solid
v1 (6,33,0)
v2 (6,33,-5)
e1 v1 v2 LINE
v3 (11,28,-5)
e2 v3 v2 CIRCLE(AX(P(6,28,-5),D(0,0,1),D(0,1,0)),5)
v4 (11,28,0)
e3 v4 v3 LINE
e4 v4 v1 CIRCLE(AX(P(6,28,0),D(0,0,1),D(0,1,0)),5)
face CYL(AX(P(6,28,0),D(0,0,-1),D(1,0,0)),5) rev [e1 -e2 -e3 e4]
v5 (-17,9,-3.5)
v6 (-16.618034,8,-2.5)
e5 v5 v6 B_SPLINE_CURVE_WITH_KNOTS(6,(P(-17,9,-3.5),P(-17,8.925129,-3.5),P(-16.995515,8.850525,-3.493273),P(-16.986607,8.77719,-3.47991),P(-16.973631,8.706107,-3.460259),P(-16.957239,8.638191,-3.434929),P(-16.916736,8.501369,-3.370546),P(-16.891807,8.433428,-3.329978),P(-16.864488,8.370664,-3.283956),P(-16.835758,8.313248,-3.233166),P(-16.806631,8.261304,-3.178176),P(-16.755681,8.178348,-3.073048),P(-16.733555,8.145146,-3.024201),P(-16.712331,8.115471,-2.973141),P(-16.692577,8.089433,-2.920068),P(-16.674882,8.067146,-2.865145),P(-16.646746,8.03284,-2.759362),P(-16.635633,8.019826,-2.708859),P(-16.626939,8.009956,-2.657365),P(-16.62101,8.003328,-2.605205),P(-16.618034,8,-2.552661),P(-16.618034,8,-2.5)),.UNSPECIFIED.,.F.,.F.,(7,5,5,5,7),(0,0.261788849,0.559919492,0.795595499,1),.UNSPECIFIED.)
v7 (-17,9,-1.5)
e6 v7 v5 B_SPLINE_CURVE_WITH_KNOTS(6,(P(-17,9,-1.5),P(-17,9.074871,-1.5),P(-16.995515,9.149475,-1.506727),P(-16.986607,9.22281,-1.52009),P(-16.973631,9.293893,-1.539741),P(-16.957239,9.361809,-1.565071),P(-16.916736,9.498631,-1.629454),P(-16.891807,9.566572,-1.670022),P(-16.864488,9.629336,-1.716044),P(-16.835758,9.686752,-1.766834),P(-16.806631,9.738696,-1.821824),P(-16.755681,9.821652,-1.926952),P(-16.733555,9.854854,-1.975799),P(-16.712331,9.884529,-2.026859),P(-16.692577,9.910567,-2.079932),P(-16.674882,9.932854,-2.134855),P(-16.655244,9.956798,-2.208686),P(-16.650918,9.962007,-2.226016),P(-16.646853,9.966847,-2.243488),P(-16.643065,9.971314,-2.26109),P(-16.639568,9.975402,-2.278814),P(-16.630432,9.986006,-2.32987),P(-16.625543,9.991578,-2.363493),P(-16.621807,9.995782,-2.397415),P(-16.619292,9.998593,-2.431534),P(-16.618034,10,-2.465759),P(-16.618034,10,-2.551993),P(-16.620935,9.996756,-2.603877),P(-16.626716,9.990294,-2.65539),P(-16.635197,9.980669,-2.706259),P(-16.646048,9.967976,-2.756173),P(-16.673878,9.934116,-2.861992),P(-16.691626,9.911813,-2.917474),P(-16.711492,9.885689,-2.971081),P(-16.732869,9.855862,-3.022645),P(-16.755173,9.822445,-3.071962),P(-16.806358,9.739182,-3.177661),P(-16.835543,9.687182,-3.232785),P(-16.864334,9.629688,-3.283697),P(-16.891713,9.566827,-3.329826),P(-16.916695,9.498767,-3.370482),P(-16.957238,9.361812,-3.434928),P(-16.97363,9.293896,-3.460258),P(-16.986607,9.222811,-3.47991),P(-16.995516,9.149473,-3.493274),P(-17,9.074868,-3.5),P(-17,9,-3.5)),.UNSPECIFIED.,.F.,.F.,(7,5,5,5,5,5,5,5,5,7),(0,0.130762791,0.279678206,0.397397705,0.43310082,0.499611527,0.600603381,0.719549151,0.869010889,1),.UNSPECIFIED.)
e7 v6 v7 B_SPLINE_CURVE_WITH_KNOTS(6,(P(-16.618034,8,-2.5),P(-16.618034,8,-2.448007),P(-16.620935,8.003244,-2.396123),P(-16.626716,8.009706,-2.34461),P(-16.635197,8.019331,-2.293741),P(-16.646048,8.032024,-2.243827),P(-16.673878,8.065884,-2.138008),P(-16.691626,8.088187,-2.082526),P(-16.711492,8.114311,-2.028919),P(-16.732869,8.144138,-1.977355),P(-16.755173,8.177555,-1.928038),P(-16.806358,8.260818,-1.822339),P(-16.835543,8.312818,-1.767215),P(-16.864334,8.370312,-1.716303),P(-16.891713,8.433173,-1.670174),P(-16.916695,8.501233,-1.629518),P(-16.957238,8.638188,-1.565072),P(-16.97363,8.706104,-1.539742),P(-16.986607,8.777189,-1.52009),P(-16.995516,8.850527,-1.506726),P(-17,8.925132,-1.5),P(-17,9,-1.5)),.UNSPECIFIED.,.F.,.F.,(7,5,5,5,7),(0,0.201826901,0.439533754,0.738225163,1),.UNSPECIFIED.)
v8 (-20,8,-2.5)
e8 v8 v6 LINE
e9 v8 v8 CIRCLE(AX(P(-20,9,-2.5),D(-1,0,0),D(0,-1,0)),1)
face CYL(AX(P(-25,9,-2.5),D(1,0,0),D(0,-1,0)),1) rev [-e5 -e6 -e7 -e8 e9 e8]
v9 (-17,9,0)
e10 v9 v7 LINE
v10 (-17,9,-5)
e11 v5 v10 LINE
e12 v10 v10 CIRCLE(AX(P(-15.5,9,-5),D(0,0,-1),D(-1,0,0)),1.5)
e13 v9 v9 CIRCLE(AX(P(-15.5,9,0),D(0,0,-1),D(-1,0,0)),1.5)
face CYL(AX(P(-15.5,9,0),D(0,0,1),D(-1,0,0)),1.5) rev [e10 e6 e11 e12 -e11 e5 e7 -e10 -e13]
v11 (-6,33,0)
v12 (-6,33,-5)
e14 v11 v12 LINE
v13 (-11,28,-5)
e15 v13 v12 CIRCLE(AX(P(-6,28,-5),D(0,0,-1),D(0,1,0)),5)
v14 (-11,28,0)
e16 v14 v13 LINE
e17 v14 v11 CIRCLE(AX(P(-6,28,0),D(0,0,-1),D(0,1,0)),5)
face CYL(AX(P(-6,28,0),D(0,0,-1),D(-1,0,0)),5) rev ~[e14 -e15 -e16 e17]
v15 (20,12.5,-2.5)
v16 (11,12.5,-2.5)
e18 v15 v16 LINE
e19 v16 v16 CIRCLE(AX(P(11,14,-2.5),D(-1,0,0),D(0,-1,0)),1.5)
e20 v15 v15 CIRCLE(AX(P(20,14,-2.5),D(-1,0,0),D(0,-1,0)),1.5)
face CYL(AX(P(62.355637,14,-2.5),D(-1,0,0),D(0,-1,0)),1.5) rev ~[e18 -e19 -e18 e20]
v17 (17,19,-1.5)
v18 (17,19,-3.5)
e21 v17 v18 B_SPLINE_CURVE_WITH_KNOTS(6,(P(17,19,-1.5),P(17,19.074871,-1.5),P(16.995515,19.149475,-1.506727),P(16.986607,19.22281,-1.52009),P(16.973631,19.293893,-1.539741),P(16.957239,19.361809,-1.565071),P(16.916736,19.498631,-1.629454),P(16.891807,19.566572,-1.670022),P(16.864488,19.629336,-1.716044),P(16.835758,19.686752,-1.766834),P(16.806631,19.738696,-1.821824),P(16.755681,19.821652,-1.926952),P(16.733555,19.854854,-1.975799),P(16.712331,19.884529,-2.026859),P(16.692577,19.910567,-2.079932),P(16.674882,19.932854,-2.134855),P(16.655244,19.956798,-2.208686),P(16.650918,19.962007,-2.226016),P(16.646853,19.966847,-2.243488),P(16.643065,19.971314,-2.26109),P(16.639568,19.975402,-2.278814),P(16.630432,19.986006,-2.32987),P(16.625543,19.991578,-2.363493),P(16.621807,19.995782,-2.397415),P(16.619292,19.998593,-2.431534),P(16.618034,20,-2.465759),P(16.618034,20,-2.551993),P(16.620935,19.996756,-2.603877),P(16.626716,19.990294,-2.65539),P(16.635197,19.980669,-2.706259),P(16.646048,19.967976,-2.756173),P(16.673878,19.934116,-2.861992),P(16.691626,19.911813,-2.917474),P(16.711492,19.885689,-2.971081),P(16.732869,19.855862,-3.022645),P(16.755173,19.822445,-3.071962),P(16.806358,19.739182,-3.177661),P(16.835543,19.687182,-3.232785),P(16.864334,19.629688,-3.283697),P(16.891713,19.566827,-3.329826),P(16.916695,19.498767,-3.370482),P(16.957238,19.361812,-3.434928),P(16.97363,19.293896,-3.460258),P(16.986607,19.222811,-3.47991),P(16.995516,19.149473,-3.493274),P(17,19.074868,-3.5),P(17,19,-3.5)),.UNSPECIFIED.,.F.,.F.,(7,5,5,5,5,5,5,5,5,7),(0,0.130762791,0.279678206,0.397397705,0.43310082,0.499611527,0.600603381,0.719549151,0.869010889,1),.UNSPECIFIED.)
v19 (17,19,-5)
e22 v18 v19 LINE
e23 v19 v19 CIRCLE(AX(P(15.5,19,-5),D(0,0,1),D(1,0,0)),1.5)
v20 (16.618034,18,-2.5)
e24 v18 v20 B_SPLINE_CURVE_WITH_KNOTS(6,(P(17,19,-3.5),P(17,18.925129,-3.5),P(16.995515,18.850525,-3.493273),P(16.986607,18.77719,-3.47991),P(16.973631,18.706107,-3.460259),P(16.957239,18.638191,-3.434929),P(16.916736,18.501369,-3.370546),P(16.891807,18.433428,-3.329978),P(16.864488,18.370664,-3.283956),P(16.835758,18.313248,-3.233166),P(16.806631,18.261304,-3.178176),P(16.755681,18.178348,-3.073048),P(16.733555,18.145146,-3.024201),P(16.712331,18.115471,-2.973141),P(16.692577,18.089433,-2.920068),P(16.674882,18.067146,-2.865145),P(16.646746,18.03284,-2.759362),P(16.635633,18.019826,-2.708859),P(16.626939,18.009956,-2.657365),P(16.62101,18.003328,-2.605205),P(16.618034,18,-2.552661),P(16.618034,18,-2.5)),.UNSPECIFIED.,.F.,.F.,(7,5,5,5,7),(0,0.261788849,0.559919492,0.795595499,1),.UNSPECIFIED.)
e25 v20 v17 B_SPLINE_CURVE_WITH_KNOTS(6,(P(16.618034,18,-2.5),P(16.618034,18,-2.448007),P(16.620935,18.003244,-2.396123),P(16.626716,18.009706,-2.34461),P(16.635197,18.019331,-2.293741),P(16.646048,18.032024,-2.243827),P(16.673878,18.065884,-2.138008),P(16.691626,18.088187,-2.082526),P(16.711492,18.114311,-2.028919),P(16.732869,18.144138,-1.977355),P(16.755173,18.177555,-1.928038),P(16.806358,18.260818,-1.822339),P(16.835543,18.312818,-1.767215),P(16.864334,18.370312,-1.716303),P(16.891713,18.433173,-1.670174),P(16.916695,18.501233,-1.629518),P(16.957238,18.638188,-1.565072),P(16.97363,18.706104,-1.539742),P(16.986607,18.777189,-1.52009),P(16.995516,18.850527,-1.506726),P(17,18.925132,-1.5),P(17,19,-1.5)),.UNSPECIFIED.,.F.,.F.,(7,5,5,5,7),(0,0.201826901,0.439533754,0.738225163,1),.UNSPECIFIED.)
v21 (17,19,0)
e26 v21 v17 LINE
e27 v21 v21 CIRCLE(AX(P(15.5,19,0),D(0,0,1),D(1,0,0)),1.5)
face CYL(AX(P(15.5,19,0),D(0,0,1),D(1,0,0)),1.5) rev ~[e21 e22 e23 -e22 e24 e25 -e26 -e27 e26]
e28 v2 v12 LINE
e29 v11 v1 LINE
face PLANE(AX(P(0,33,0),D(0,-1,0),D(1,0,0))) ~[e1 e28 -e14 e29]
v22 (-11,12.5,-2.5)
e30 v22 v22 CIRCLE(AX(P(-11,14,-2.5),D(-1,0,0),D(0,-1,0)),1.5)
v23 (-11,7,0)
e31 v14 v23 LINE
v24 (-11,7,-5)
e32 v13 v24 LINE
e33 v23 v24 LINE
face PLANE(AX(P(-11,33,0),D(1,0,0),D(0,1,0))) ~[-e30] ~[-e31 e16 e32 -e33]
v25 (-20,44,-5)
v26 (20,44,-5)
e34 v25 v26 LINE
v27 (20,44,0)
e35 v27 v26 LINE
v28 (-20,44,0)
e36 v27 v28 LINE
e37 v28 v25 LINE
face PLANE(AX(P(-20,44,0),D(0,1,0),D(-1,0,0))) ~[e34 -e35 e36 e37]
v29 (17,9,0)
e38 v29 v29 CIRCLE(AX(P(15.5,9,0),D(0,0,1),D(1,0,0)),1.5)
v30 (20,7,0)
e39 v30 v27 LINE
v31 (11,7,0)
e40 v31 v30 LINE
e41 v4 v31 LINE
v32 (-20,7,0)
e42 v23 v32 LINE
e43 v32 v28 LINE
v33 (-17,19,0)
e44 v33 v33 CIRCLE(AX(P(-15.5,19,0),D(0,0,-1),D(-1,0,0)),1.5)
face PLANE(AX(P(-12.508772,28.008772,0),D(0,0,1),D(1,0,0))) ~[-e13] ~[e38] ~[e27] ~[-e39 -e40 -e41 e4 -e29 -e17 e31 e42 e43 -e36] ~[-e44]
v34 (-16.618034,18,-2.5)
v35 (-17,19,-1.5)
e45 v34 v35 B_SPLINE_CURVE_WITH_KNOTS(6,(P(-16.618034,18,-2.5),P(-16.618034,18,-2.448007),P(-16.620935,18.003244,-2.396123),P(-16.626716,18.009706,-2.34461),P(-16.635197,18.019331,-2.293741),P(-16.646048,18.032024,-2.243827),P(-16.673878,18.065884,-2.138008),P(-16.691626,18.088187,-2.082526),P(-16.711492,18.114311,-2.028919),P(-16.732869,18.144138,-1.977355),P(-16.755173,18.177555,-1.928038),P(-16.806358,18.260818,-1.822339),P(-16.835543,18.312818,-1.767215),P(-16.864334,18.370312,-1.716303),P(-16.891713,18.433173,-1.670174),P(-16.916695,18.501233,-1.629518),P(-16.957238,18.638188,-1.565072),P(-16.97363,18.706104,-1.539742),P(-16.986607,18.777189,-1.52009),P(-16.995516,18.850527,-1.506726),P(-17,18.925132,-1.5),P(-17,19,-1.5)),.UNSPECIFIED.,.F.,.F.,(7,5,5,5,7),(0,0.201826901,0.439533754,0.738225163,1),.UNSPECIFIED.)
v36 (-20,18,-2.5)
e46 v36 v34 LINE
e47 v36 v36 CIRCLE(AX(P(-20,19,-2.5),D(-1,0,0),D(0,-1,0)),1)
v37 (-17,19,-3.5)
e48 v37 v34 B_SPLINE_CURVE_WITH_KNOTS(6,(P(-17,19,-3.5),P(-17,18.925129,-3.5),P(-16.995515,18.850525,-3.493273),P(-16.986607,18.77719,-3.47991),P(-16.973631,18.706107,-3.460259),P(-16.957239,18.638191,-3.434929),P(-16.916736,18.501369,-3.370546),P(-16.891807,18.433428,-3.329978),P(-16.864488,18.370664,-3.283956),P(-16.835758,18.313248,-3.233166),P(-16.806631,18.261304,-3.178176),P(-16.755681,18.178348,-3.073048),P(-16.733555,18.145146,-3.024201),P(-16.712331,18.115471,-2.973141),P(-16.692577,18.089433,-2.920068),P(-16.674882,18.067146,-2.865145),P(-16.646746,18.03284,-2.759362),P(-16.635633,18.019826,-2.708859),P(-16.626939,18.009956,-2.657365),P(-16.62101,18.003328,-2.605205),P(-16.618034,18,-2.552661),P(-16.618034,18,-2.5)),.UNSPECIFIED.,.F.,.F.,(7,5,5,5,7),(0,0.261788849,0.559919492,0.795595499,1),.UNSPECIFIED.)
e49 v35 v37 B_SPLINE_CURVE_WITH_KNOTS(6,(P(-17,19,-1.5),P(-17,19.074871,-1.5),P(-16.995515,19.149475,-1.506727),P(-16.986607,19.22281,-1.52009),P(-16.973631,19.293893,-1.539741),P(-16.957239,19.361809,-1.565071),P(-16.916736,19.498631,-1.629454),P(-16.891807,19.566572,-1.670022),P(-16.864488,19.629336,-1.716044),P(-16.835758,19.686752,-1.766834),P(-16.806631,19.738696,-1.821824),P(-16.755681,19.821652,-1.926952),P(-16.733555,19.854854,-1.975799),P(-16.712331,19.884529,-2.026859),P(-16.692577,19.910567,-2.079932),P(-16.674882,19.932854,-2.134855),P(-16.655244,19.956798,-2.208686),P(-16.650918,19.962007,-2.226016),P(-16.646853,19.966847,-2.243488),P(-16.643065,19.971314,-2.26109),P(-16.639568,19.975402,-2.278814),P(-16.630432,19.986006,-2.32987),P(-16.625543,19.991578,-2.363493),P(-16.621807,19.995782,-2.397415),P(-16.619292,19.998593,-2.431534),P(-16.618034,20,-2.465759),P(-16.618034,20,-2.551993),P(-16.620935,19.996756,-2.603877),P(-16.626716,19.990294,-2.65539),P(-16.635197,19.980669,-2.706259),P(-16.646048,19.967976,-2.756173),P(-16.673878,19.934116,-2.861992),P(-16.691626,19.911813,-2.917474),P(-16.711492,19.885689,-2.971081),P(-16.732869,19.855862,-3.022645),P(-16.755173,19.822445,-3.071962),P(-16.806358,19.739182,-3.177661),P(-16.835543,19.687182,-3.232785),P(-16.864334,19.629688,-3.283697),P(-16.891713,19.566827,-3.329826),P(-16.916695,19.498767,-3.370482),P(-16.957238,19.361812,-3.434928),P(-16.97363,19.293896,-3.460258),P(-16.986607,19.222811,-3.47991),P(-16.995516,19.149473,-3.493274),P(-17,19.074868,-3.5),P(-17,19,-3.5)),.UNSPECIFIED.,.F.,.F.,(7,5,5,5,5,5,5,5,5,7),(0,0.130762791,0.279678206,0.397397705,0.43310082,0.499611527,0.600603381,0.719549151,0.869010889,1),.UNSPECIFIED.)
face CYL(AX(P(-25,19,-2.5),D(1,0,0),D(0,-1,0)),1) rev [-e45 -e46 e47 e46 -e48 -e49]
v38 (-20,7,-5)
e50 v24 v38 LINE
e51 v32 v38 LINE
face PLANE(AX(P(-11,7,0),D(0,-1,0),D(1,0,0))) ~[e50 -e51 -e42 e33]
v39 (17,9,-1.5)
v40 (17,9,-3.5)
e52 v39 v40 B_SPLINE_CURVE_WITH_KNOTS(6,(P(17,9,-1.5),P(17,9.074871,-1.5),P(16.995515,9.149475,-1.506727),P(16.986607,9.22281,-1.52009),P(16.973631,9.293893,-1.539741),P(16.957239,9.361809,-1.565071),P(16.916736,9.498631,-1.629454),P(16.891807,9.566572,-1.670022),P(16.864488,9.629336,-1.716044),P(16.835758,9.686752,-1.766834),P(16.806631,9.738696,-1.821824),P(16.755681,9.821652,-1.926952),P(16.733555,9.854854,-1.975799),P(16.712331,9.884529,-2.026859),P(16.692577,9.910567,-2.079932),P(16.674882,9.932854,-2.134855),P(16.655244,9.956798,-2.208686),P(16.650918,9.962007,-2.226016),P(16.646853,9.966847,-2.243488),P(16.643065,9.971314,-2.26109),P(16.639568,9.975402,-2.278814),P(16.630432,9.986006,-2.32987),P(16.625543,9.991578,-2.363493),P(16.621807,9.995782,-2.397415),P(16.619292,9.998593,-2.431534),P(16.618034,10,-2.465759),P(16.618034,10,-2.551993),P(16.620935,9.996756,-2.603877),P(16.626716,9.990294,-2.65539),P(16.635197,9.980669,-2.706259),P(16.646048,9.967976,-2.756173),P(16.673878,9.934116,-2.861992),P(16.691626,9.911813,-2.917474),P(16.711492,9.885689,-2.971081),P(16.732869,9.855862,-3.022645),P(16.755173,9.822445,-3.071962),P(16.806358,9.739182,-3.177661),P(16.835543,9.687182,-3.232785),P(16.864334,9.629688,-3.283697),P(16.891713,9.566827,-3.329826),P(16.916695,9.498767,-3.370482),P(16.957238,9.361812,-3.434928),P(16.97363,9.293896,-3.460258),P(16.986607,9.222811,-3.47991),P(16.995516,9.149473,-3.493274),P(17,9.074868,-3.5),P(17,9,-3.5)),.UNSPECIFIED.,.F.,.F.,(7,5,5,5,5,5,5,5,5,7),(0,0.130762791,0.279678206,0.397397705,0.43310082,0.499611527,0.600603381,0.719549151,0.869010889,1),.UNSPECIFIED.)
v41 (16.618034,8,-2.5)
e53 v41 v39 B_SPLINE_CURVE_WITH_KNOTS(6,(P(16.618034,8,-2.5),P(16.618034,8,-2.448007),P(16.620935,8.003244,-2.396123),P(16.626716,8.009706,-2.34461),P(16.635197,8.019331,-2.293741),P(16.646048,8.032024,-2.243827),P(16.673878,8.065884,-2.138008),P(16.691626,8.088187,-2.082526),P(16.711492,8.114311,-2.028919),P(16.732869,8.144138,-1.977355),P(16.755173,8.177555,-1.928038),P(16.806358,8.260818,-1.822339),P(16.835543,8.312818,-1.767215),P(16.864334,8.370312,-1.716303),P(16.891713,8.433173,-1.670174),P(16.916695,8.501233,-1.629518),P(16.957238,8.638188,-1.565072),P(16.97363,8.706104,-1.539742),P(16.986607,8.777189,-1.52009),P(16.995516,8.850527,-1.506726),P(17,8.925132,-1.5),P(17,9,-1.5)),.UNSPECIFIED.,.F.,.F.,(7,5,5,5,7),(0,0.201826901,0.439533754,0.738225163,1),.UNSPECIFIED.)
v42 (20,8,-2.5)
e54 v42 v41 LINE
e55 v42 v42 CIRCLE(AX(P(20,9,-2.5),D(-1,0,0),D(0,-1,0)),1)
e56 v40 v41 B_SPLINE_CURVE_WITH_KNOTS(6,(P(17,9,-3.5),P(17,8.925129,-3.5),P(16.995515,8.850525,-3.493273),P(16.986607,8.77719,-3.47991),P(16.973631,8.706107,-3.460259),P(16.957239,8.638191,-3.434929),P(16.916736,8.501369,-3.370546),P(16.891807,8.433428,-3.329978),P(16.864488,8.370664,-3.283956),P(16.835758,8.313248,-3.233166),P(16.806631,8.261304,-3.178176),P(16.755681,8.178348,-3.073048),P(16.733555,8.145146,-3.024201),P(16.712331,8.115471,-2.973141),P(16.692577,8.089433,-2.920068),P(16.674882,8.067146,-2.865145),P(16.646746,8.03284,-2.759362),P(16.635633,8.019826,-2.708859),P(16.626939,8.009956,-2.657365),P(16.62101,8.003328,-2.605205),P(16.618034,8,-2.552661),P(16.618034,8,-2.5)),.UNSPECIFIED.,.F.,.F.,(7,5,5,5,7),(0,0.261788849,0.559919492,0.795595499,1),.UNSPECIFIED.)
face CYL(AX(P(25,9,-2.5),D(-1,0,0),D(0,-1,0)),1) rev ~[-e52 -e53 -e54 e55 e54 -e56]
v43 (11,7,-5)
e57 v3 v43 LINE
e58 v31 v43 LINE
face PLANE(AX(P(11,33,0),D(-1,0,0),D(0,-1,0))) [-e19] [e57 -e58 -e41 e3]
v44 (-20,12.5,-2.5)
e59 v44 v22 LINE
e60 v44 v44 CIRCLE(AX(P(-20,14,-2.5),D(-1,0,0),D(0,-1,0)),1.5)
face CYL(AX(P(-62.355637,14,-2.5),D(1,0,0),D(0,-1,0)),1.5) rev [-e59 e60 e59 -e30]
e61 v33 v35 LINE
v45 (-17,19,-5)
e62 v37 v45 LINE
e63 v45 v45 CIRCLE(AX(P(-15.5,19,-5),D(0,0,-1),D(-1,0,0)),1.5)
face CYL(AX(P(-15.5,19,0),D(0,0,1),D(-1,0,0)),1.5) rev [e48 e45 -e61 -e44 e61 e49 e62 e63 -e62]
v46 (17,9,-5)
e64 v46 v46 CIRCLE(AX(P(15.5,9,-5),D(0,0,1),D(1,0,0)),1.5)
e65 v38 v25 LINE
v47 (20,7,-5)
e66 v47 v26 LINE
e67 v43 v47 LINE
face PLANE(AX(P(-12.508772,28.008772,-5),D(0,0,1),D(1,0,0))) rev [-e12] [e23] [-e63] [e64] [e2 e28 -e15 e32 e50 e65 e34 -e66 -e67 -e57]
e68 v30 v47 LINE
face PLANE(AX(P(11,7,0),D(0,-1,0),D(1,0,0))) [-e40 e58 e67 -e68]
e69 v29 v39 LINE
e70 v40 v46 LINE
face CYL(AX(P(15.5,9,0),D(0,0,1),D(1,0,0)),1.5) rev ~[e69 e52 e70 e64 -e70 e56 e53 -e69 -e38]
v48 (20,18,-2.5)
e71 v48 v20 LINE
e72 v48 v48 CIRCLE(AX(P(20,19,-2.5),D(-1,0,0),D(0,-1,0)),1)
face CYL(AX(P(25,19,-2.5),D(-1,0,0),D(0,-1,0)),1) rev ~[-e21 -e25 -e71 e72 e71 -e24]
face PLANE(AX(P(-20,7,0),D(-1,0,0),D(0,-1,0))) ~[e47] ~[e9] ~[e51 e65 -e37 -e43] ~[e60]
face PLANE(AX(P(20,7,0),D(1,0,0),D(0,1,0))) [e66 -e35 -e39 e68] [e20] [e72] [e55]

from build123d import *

# Parameters (mm, degrees)
F0_R     = 1.5
F1_DEPTH = 5
F3_D     = 2
F3_DEPTH = 5
F3_TIP   = 0.600860619
F4_R     = 5
F5_D     = 3


# Not quite as in the source:
# - a feature names something its author has since deleted; it is built from what else it names


with BuildPart() as f1:
    # F0 (on Top) → F1 (new body)
    with BuildSketch(Plane.XY):
        Polygon((11, 33), (11, 7), (20, 7), (20, 44), (0, 44), (0, 33), align=None)
        with Locations((15.5, 9)):
            Circle(F0_R, mode=Mode.SUBTRACT)
        with Locations((15.5, 19)):
            Circle(F0_R, mode=Mode.SUBTRACT)
    extrude(amount=-F1_DEPTH)

    # F3
    with Locations(Plane.YZ.offset(20)):
        with Locations((9, -2.5), (19, -2.5)):
            Hole(F3_D / 2, depth=F3_DEPTH)
            with Locations((0, 0, -(F3_DEPTH + F3_TIP / 2))):  # 118° drill point
                Cone(0, F3_D / 2, F3_TIP, mode=Mode.SUBTRACT)

    # F4
    f4_edges = [f1.edges().sort_by_distance(p)[0] for p in [
        (11, 33, -2.5),
    ]]
    fillet(f4_edges, radius=F4_R)

    # F5 (through all)
    with Locations(Plane.YZ.offset(20)):
        with Locations((14, -2.5)):
            Hole(F5_D / 2)

    # F6: F1 across plane


with BuildPart() as f1_1:
    add(f1.part)
    add(f1.part.mirror(Plane.YZ))


solid = f1_1.part
